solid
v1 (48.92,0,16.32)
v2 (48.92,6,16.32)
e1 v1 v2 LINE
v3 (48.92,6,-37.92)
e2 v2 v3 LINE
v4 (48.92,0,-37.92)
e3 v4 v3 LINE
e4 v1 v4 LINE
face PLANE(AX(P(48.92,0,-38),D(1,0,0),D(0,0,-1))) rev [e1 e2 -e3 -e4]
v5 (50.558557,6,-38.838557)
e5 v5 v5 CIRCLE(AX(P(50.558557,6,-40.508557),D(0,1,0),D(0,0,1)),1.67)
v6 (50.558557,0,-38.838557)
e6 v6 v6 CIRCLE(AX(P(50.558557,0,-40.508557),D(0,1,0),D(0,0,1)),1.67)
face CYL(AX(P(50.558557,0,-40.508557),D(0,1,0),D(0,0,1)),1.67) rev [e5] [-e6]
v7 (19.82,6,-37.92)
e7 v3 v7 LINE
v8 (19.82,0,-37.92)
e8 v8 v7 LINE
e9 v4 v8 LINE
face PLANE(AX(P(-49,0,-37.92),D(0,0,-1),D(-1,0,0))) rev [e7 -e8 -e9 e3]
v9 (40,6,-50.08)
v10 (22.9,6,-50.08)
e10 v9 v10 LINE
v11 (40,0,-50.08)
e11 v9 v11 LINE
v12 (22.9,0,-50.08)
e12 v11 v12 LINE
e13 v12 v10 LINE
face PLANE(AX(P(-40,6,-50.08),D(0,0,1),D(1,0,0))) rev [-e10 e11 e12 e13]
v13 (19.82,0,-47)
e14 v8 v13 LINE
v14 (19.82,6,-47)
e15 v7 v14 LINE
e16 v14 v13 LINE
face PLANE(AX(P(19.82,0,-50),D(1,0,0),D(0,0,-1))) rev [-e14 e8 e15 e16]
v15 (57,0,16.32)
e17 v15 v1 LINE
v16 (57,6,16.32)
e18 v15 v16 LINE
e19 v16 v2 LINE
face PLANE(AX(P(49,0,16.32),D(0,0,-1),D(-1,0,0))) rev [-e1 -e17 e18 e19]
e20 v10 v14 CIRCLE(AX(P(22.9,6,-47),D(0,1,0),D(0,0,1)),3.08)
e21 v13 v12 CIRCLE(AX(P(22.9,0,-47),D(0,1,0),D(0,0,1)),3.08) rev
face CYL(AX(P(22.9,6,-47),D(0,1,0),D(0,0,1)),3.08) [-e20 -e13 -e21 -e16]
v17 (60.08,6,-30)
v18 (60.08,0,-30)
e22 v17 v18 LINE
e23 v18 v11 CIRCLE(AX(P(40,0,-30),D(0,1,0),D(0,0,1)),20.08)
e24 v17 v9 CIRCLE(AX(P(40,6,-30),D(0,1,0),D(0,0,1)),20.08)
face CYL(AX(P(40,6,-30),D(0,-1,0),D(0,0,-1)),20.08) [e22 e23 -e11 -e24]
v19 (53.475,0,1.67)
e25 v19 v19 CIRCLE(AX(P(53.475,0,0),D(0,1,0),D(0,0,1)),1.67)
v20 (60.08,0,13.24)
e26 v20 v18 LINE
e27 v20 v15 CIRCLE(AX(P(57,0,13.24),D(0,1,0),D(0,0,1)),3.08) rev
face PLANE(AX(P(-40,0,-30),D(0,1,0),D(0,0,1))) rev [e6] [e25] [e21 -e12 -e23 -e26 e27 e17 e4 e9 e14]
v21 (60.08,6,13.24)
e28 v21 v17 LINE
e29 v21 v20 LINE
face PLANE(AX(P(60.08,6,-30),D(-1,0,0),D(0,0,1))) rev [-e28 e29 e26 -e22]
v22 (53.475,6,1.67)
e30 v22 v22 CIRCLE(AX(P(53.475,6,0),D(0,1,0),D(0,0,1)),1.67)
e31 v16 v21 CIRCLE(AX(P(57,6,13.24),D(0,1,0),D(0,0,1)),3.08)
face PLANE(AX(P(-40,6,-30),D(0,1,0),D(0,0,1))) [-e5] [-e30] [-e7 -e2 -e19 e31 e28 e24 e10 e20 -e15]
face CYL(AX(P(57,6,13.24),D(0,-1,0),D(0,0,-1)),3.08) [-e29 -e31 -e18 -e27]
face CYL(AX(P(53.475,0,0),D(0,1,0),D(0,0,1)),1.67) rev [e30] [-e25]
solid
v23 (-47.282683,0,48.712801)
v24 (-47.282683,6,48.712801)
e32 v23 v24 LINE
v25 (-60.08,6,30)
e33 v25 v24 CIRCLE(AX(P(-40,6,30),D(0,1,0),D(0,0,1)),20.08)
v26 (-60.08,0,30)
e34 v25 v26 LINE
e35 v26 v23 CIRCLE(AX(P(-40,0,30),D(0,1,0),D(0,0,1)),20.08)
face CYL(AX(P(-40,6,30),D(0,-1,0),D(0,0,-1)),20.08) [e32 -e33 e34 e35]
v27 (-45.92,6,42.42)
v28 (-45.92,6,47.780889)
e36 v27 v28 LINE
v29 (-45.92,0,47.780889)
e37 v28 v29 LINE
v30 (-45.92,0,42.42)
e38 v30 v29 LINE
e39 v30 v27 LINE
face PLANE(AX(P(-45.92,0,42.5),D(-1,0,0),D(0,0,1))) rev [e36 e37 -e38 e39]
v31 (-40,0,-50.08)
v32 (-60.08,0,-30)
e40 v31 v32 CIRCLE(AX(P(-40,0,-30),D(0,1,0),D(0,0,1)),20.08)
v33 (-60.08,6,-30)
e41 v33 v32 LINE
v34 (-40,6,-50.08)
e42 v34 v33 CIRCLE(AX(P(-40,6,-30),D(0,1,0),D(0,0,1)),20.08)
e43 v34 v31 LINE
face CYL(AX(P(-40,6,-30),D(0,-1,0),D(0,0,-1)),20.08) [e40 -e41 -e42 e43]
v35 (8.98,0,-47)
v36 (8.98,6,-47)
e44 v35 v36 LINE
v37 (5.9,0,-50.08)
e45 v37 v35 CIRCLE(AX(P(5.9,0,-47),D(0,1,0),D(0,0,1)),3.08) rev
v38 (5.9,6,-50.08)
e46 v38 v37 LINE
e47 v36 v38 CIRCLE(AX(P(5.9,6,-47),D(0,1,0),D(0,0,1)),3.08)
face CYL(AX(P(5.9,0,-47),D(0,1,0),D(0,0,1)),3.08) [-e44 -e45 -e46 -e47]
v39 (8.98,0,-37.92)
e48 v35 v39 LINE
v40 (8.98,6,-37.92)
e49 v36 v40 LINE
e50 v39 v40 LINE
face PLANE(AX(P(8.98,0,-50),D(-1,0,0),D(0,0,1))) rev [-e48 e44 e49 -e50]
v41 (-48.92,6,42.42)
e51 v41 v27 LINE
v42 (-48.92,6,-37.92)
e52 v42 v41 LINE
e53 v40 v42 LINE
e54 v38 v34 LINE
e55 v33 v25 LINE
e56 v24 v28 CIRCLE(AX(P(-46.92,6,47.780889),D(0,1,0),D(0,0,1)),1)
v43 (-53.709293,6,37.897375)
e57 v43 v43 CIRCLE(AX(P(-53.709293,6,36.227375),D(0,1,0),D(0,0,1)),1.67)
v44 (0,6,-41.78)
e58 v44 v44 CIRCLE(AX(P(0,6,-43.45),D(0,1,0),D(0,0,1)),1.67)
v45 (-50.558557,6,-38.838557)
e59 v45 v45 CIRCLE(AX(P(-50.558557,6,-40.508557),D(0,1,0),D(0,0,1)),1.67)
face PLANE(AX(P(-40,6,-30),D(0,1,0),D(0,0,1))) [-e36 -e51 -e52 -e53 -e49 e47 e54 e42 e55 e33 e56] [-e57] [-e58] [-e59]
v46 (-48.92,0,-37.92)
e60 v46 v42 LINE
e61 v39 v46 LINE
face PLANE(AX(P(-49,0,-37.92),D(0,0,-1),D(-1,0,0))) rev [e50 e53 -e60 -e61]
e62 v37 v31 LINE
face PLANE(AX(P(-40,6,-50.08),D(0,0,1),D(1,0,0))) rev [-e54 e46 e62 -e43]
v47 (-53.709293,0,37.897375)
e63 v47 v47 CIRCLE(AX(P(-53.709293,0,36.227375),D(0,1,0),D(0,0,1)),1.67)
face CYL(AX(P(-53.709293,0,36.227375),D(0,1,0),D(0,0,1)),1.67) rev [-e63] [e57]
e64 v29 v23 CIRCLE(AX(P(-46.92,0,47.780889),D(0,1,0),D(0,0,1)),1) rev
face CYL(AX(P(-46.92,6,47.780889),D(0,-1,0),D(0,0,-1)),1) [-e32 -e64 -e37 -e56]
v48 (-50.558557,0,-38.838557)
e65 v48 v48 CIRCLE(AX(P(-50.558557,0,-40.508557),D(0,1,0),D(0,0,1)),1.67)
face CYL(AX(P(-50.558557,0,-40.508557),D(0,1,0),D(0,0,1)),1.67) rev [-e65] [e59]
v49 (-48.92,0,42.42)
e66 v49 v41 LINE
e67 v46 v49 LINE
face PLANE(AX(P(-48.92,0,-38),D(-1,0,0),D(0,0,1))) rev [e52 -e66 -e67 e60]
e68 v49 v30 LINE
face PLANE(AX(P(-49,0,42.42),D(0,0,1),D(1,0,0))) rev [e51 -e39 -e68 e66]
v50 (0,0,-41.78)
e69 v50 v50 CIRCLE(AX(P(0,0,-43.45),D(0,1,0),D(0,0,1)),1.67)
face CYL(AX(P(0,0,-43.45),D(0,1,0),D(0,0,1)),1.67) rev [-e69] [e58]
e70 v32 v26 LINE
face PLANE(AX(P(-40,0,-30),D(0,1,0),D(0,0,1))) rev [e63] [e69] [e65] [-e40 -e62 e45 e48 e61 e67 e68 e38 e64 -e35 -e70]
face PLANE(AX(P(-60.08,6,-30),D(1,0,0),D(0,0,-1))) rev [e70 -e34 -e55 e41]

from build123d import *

# Parameters (mm, degrees)
BOSS_EXTRUDE1_DEPTH    = 6
CUT_EXTRUDE1_DEPTH     = 79.33262411
SKETCH3_W              = 25
SKETCH3_H              = 31.620571099
CUT_EXTRUDE2_DEPTH     = 79.33262411
FILLET1_R              = 3
SKETCH4_W              = 11
SKETCH4_H              = 12
CUT_EXTRUDE3_DEPTH     = 79.33262411
FILLET2_R              = 3
FILLET3_R              = 3
SKETCH5_R              = 1.75
CUT_EXTRUDE4_DEPTH     = 79.33262411
MOVE_FACE2_BY          = 0.08
MOVE_FACE2_2_BY        = 0.08
MOVE_FACE2_3_BY        = 0.08
MOVE_FACE2_4_BY        = 0.08
MOVE_FACE2_5_BY        = 0.08
MOVE_FACE2_6_BY        = 0.08
MOVE_FACE2_7_BY        = 0.08
MOVE_FACE2_8_BY        = 0.08
MOVE_FACE2_9_BY        = 0.08
MOVE_FACE2_10_BY       = 0.08
MOVE_FACE2_11_BY       = 0.08
MOVE_FACE3_OUTLINE_R   = 1.75
MOVE_FACE3_OUTLINE_R_2 = 1.67
MOVE_FACE3_DEPTH       = 6
FILLET4_R              = 1


# Read off the part's stored shape, not the designer's step: Move Face3
with BuildPart() as part:
    # Sketch1 → Boss-Extrude1 (new body)
    with BuildSketch(Plane(origin=(0, 0, 0), x_dir=(1, 0, 0), z_dir=(0, 1, 0))):
        with BuildLine():
            Line((-60, 30), (-60, -30))
            ThreePointArc((-60, -30), (-54.142135624, -44.142135624), (-40, -50))
            Line((-40, -50), (40, -50))
            ThreePointArc((40, -50), (54.142135624, -44.142135624), (60, -30))
            Line((60, -30), (60, 30))
            ThreePointArc((60, 30), (54.142135624, 44.142135624), (40, 50))
            Line((40, 50), (-40, 50))
            ThreePointArc((-40, 50), (-54.142135624, 44.142135624), (-60, 30))
        make_face()
    extrude(amount=BOSS_EXTRUDE1_DEPTH)

    # Sketch2 → Cut-Extrude1 (cut, through all)
    with BuildSketch(Plane(origin=(0, 6, 0), x_dir=(1, 0, 0), z_dir=(0, 1, 0))):
        Polygon((-49, 38), (49, 38), (49, -50), (-46, -50), (-46, -42.5), (-49, -42.5), align=None)
    extrude(amount=-CUT_EXTRUDE1_DEPTH, mode=Mode.SUBTRACT)

    # Sketch3 → Cut-Extrude2 (cut, through all)
    with BuildSketch(Plane(origin=(0, 6, 0), x_dir=(1, 0, 0), z_dir=(0, 1, 0))):
        with Locations((61.5, -32.05028555)):
            Rectangle(SKETCH3_W, SKETCH3_H)
    extrude(amount=-CUT_EXTRUDE2_DEPTH, mode=Mode.SUBTRACT)

    # Fillet1
    fillet1_edges = [part.edges().sort_by_distance(p)[0] for p in [
        (60, 3, 16.24),
    ]]
    fillet(fillet1_edges, radius=FILLET1_R)

    # Sketch4 → Cut-Extrude3 (cut, through all)
    with BuildSketch(Plane(origin=(0, 6, 0), x_dir=(1, 0, 0), z_dir=(0, 1, 0))):
        with Locations((14.4, 44)):
            Rectangle(SKETCH4_W, SKETCH4_H)
    extrude(amount=-CUT_EXTRUDE3_DEPTH, mode=Mode.SUBTRACT)


with BuildPart() as cut_extrude3_piece_1:
    # of the separate pieces the step leaves, piece 1, a body of its own (cut_extrude3_pieces)
    add(part.part.solids().sort_by_distance((8.9, 0, -50))[0])

    # Fillet2
    fillet2_edges = [cut_extrude3_piece_1.edges().sort_by_distance(p)[0] for p in [
        (8.9, 3, -50),
    ]]
    fillet(fillet2_edges, radius=FILLET2_R)


with BuildPart() as cut_extrude3_piece_2:
    # of the separate pieces the step leaves, piece 2, a body of its own (cut_extrude3_pieces)
    add(part.part.solids().sort_by_distance((60, 0, 13.24))[0])

    # Fillet3
    fillet3_edges = [cut_extrude3_piece_2.edges().sort_by_distance(p)[0] for p in [
        (19.9, 3, -50),
    ]]
    fillet(fillet3_edges, radius=FILLET3_R)


with BuildPart() as cut_extrude4_tool:
    # Sketch5 → Cut-Extrude4 (new, through all)
    with BuildSketch(Plane(origin=(0, 6, 0), x_dir=(1, 0, 0), z_dir=(0, 1, 0))):
        with Locations(Location((53.475, 0, 0), (0, 0, 270))):
            Circle(SKETCH5_R)
        with Locations(Location((-53.709292606, -36.227375296, 0), (0, 0, 270))):
            Circle(SKETCH5_R)
        with Locations(Location((0, 43.45, 0), (0, 0, 270))):
            Circle(SKETCH5_R)
        with Locations(Location((50.558556763, 40.508556763, 0), (0, 0, 270))):
            Circle(SKETCH5_R)
        with Locations(Location((-50.558556763, 40.508556763, 0), (0, 0, 90))):
            Circle(SKETCH5_R)
    extrude(amount=-CUT_EXTRUDE4_DEPTH)


with BuildPart() as cut_extrude3_piece_1_1:
    add(cut_extrude3_piece_1.part)

    # Cut-Extrude4: cut by cut_extrude4_tool
    add(cut_extrude4_tool.part, mode=Mode.SUBTRACT)

    # Move Face3 outline → Move Face3 (add)
    # profile 1 of 4: a face of its own
    with BuildSketch(Plane(origin=(0, 0, 0), x_dir=(1, 0, 0), z_dir=(0, 1, 0))):
        with BuildLine():
            Line((5.9, 50.08), (-40, 50.08))
            ThreePointArc((-40, 50.08), (-54.198704166, 44.198704166), (-60.08, 30))
            Line((-60.08, 30), (-60.08, -30))
            ThreePointArc((-60.08, -30), (-56.156732343, -41.923355232), (-45.92, -49.187495928))
            Line((-45.92, -49.187495928), (-45.92, -42.42))
            Line((-45.92, -42.42), (-48.92, -42.42))
            Line((-48.92, -42.42), (-48.92, 37.92))
            Line((-48.92, 37.92), (8.98, 37.92))
            Line((8.98, 37.92), (8.98, 47))
            ThreePointArc((8.98, 47), (8.077888886, 49.177888886), (5.9, 50.08))
        make_face()
        with BuildLine():
            Line((-60, -30), (-60, 30))
            ThreePointArc((-60, 30), (-54.142135624, 44.142135624), (-40, 50))
            Line((-40, 50), (5.9, 50))
            ThreePointArc((5.9, 50), (8.021320344, 49.121320344), (8.9, 47))
            Line((8.9, 47), (8.9, 38))
            Line((8.9, 38), (-49, 38))
            Line((-49, 38), (-49, -42.5))
            Line((-49, -42.5), (-46, -42.5))
            Line((-46, -42.5), (-46, -49.078784028))
            ThreePointArc((-46, -49.078784028), (-56.124515497, -41.832159566), (-60, -30))
        make_face(mode=Mode.SUBTRACT)
    # profile 2 of 4: a face of its own
    with BuildSketch(Plane(origin=(0, 0, 0), x_dir=(1, 0, 0), z_dir=(0, 1, 0))):
        with Locations((-53.709292606, -36.227375296)):
            Circle(MOVE_FACE3_OUTLINE_R)
        with Locations((-53.709292606, -36.227375296)):
            Circle(MOVE_FACE3_OUTLINE_R_2, mode=Mode.SUBTRACT)
    # profile 3 of 4: a face of its own
    with BuildSketch(Plane(origin=(0, 0, 0), x_dir=(1, 0, 0), z_dir=(0, 1, 0))):
        with Locations((-50.558556763, 40.508556763)):
            Circle(MOVE_FACE3_OUTLINE_R)
        with Locations((-50.558556763, 40.508556763)):
            Circle(MOVE_FACE3_OUTLINE_R_2, mode=Mode.SUBTRACT)
    # profile 4 of 4: a face of its own
    with BuildSketch(Plane(origin=(0, 0, 0), x_dir=(1, 0, 0), z_dir=(0, 1, 0))):
        with Locations((0, 43.45)):
            Circle(MOVE_FACE3_OUTLINE_R)
        with Locations((0, 43.45)):
            Circle(MOVE_FACE3_OUTLINE_R_2, mode=Mode.SUBTRACT)
    extrude(amount=MOVE_FACE3_DEPTH)

    # Fillet4
    fillet4_edges = [cut_extrude3_piece_1_1.edges().sort_by_distance(p)[0] for p in [
        (-45.92, 3, 49.187495928),
    ]]
    fillet(fillet4_edges, radius=FILLET4_R)


with BuildPart() as cut_extrude3_piece_2_1:
    add(cut_extrude3_piece_2.part)

    # Cut-Extrude4: cut by cut_extrude4_tool
    add(cut_extrude4_tool.part, mode=Mode.SUBTRACT)

    # Move Face2: a curved face moved outward by 0.08
    add(Solid.thicken(cut_extrude3_piece_2_1.faces().sort_by_distance((50.558556763, 3, -42.258556763))[0], MOVE_FACE2_BY))

    # Move Face2 2: a curved face moved outward by 0.08
    add(Solid.thicken(cut_extrude3_piece_2_1.faces().sort_by_distance((53.475, 3, -1.75))[0], MOVE_FACE2_2_BY))

    # Move Face2 3: a face moved outward by 0.08
    extrude(cut_extrude3_piece_2_1.faces().sort_by_distance((19.9, 3, -42.5))[0], amount=MOVE_FACE2_3_BY, dir=(-1, 0, 0))

    # Move Face2 4: a curved face moved outward by 0.08
    add(Solid.thicken(cut_extrude3_piece_2_1.faces().sort_by_distance((20.778679656, 3, -49.121320344))[0], MOVE_FACE2_4_BY))

    # Move Face2 5: a face moved outward by 0.08
    extrude(cut_extrude3_piece_2_1.faces().sort_by_distance((31.45, 3, -50))[0], amount=MOVE_FACE2_5_BY, dir=(0, 0, -1))

    # Move Face2 6: a curved face moved outward by 0.08
    add(Solid.thicken(cut_extrude3_piece_2_1.faces().sort_by_distance((54.142135624, 3, -44.142135624))[0], MOVE_FACE2_6_BY))

    # Move Face2 7: a face moved outward by 0.08
    extrude(cut_extrude3_piece_2_1.faces().sort_by_distance((60, 3, -8.38))[0], amount=MOVE_FACE2_7_BY, dir=(1, 0, 0))

    # Move Face2 8: a curved face moved outward by 0.08
    add(Solid.thicken(cut_extrude3_piece_2_1.faces().sort_by_distance((59.121320344, 3, 15.361320344))[0], MOVE_FACE2_8_BY))

    # Move Face2 9: a face moved outward by 0.08
    extrude(cut_extrude3_piece_2_1.faces().sort_by_distance((49, 3, -10.88))[0], amount=MOVE_FACE2_9_BY, dir=(-1, 0, 0))

    # Move Face2 10: a face moved outward by 0.08
    extrude(cut_extrude3_piece_2_1.faces().sort_by_distance((34.45, 3, -38))[0], amount=MOVE_FACE2_10_BY, dir=(0, 0, 1))

    # Move Face2 11: a face moved outward by 0.08
    extrude(cut_extrude3_piece_2_1.faces().sort_by_distance((53, 3, 16.24))[0], amount=MOVE_FACE2_11_BY, dir=(0, 0, 1))


solid = Compound([cut_extrude3_piece_1_1.part, cut_extrude3_piece_2_1.part])
